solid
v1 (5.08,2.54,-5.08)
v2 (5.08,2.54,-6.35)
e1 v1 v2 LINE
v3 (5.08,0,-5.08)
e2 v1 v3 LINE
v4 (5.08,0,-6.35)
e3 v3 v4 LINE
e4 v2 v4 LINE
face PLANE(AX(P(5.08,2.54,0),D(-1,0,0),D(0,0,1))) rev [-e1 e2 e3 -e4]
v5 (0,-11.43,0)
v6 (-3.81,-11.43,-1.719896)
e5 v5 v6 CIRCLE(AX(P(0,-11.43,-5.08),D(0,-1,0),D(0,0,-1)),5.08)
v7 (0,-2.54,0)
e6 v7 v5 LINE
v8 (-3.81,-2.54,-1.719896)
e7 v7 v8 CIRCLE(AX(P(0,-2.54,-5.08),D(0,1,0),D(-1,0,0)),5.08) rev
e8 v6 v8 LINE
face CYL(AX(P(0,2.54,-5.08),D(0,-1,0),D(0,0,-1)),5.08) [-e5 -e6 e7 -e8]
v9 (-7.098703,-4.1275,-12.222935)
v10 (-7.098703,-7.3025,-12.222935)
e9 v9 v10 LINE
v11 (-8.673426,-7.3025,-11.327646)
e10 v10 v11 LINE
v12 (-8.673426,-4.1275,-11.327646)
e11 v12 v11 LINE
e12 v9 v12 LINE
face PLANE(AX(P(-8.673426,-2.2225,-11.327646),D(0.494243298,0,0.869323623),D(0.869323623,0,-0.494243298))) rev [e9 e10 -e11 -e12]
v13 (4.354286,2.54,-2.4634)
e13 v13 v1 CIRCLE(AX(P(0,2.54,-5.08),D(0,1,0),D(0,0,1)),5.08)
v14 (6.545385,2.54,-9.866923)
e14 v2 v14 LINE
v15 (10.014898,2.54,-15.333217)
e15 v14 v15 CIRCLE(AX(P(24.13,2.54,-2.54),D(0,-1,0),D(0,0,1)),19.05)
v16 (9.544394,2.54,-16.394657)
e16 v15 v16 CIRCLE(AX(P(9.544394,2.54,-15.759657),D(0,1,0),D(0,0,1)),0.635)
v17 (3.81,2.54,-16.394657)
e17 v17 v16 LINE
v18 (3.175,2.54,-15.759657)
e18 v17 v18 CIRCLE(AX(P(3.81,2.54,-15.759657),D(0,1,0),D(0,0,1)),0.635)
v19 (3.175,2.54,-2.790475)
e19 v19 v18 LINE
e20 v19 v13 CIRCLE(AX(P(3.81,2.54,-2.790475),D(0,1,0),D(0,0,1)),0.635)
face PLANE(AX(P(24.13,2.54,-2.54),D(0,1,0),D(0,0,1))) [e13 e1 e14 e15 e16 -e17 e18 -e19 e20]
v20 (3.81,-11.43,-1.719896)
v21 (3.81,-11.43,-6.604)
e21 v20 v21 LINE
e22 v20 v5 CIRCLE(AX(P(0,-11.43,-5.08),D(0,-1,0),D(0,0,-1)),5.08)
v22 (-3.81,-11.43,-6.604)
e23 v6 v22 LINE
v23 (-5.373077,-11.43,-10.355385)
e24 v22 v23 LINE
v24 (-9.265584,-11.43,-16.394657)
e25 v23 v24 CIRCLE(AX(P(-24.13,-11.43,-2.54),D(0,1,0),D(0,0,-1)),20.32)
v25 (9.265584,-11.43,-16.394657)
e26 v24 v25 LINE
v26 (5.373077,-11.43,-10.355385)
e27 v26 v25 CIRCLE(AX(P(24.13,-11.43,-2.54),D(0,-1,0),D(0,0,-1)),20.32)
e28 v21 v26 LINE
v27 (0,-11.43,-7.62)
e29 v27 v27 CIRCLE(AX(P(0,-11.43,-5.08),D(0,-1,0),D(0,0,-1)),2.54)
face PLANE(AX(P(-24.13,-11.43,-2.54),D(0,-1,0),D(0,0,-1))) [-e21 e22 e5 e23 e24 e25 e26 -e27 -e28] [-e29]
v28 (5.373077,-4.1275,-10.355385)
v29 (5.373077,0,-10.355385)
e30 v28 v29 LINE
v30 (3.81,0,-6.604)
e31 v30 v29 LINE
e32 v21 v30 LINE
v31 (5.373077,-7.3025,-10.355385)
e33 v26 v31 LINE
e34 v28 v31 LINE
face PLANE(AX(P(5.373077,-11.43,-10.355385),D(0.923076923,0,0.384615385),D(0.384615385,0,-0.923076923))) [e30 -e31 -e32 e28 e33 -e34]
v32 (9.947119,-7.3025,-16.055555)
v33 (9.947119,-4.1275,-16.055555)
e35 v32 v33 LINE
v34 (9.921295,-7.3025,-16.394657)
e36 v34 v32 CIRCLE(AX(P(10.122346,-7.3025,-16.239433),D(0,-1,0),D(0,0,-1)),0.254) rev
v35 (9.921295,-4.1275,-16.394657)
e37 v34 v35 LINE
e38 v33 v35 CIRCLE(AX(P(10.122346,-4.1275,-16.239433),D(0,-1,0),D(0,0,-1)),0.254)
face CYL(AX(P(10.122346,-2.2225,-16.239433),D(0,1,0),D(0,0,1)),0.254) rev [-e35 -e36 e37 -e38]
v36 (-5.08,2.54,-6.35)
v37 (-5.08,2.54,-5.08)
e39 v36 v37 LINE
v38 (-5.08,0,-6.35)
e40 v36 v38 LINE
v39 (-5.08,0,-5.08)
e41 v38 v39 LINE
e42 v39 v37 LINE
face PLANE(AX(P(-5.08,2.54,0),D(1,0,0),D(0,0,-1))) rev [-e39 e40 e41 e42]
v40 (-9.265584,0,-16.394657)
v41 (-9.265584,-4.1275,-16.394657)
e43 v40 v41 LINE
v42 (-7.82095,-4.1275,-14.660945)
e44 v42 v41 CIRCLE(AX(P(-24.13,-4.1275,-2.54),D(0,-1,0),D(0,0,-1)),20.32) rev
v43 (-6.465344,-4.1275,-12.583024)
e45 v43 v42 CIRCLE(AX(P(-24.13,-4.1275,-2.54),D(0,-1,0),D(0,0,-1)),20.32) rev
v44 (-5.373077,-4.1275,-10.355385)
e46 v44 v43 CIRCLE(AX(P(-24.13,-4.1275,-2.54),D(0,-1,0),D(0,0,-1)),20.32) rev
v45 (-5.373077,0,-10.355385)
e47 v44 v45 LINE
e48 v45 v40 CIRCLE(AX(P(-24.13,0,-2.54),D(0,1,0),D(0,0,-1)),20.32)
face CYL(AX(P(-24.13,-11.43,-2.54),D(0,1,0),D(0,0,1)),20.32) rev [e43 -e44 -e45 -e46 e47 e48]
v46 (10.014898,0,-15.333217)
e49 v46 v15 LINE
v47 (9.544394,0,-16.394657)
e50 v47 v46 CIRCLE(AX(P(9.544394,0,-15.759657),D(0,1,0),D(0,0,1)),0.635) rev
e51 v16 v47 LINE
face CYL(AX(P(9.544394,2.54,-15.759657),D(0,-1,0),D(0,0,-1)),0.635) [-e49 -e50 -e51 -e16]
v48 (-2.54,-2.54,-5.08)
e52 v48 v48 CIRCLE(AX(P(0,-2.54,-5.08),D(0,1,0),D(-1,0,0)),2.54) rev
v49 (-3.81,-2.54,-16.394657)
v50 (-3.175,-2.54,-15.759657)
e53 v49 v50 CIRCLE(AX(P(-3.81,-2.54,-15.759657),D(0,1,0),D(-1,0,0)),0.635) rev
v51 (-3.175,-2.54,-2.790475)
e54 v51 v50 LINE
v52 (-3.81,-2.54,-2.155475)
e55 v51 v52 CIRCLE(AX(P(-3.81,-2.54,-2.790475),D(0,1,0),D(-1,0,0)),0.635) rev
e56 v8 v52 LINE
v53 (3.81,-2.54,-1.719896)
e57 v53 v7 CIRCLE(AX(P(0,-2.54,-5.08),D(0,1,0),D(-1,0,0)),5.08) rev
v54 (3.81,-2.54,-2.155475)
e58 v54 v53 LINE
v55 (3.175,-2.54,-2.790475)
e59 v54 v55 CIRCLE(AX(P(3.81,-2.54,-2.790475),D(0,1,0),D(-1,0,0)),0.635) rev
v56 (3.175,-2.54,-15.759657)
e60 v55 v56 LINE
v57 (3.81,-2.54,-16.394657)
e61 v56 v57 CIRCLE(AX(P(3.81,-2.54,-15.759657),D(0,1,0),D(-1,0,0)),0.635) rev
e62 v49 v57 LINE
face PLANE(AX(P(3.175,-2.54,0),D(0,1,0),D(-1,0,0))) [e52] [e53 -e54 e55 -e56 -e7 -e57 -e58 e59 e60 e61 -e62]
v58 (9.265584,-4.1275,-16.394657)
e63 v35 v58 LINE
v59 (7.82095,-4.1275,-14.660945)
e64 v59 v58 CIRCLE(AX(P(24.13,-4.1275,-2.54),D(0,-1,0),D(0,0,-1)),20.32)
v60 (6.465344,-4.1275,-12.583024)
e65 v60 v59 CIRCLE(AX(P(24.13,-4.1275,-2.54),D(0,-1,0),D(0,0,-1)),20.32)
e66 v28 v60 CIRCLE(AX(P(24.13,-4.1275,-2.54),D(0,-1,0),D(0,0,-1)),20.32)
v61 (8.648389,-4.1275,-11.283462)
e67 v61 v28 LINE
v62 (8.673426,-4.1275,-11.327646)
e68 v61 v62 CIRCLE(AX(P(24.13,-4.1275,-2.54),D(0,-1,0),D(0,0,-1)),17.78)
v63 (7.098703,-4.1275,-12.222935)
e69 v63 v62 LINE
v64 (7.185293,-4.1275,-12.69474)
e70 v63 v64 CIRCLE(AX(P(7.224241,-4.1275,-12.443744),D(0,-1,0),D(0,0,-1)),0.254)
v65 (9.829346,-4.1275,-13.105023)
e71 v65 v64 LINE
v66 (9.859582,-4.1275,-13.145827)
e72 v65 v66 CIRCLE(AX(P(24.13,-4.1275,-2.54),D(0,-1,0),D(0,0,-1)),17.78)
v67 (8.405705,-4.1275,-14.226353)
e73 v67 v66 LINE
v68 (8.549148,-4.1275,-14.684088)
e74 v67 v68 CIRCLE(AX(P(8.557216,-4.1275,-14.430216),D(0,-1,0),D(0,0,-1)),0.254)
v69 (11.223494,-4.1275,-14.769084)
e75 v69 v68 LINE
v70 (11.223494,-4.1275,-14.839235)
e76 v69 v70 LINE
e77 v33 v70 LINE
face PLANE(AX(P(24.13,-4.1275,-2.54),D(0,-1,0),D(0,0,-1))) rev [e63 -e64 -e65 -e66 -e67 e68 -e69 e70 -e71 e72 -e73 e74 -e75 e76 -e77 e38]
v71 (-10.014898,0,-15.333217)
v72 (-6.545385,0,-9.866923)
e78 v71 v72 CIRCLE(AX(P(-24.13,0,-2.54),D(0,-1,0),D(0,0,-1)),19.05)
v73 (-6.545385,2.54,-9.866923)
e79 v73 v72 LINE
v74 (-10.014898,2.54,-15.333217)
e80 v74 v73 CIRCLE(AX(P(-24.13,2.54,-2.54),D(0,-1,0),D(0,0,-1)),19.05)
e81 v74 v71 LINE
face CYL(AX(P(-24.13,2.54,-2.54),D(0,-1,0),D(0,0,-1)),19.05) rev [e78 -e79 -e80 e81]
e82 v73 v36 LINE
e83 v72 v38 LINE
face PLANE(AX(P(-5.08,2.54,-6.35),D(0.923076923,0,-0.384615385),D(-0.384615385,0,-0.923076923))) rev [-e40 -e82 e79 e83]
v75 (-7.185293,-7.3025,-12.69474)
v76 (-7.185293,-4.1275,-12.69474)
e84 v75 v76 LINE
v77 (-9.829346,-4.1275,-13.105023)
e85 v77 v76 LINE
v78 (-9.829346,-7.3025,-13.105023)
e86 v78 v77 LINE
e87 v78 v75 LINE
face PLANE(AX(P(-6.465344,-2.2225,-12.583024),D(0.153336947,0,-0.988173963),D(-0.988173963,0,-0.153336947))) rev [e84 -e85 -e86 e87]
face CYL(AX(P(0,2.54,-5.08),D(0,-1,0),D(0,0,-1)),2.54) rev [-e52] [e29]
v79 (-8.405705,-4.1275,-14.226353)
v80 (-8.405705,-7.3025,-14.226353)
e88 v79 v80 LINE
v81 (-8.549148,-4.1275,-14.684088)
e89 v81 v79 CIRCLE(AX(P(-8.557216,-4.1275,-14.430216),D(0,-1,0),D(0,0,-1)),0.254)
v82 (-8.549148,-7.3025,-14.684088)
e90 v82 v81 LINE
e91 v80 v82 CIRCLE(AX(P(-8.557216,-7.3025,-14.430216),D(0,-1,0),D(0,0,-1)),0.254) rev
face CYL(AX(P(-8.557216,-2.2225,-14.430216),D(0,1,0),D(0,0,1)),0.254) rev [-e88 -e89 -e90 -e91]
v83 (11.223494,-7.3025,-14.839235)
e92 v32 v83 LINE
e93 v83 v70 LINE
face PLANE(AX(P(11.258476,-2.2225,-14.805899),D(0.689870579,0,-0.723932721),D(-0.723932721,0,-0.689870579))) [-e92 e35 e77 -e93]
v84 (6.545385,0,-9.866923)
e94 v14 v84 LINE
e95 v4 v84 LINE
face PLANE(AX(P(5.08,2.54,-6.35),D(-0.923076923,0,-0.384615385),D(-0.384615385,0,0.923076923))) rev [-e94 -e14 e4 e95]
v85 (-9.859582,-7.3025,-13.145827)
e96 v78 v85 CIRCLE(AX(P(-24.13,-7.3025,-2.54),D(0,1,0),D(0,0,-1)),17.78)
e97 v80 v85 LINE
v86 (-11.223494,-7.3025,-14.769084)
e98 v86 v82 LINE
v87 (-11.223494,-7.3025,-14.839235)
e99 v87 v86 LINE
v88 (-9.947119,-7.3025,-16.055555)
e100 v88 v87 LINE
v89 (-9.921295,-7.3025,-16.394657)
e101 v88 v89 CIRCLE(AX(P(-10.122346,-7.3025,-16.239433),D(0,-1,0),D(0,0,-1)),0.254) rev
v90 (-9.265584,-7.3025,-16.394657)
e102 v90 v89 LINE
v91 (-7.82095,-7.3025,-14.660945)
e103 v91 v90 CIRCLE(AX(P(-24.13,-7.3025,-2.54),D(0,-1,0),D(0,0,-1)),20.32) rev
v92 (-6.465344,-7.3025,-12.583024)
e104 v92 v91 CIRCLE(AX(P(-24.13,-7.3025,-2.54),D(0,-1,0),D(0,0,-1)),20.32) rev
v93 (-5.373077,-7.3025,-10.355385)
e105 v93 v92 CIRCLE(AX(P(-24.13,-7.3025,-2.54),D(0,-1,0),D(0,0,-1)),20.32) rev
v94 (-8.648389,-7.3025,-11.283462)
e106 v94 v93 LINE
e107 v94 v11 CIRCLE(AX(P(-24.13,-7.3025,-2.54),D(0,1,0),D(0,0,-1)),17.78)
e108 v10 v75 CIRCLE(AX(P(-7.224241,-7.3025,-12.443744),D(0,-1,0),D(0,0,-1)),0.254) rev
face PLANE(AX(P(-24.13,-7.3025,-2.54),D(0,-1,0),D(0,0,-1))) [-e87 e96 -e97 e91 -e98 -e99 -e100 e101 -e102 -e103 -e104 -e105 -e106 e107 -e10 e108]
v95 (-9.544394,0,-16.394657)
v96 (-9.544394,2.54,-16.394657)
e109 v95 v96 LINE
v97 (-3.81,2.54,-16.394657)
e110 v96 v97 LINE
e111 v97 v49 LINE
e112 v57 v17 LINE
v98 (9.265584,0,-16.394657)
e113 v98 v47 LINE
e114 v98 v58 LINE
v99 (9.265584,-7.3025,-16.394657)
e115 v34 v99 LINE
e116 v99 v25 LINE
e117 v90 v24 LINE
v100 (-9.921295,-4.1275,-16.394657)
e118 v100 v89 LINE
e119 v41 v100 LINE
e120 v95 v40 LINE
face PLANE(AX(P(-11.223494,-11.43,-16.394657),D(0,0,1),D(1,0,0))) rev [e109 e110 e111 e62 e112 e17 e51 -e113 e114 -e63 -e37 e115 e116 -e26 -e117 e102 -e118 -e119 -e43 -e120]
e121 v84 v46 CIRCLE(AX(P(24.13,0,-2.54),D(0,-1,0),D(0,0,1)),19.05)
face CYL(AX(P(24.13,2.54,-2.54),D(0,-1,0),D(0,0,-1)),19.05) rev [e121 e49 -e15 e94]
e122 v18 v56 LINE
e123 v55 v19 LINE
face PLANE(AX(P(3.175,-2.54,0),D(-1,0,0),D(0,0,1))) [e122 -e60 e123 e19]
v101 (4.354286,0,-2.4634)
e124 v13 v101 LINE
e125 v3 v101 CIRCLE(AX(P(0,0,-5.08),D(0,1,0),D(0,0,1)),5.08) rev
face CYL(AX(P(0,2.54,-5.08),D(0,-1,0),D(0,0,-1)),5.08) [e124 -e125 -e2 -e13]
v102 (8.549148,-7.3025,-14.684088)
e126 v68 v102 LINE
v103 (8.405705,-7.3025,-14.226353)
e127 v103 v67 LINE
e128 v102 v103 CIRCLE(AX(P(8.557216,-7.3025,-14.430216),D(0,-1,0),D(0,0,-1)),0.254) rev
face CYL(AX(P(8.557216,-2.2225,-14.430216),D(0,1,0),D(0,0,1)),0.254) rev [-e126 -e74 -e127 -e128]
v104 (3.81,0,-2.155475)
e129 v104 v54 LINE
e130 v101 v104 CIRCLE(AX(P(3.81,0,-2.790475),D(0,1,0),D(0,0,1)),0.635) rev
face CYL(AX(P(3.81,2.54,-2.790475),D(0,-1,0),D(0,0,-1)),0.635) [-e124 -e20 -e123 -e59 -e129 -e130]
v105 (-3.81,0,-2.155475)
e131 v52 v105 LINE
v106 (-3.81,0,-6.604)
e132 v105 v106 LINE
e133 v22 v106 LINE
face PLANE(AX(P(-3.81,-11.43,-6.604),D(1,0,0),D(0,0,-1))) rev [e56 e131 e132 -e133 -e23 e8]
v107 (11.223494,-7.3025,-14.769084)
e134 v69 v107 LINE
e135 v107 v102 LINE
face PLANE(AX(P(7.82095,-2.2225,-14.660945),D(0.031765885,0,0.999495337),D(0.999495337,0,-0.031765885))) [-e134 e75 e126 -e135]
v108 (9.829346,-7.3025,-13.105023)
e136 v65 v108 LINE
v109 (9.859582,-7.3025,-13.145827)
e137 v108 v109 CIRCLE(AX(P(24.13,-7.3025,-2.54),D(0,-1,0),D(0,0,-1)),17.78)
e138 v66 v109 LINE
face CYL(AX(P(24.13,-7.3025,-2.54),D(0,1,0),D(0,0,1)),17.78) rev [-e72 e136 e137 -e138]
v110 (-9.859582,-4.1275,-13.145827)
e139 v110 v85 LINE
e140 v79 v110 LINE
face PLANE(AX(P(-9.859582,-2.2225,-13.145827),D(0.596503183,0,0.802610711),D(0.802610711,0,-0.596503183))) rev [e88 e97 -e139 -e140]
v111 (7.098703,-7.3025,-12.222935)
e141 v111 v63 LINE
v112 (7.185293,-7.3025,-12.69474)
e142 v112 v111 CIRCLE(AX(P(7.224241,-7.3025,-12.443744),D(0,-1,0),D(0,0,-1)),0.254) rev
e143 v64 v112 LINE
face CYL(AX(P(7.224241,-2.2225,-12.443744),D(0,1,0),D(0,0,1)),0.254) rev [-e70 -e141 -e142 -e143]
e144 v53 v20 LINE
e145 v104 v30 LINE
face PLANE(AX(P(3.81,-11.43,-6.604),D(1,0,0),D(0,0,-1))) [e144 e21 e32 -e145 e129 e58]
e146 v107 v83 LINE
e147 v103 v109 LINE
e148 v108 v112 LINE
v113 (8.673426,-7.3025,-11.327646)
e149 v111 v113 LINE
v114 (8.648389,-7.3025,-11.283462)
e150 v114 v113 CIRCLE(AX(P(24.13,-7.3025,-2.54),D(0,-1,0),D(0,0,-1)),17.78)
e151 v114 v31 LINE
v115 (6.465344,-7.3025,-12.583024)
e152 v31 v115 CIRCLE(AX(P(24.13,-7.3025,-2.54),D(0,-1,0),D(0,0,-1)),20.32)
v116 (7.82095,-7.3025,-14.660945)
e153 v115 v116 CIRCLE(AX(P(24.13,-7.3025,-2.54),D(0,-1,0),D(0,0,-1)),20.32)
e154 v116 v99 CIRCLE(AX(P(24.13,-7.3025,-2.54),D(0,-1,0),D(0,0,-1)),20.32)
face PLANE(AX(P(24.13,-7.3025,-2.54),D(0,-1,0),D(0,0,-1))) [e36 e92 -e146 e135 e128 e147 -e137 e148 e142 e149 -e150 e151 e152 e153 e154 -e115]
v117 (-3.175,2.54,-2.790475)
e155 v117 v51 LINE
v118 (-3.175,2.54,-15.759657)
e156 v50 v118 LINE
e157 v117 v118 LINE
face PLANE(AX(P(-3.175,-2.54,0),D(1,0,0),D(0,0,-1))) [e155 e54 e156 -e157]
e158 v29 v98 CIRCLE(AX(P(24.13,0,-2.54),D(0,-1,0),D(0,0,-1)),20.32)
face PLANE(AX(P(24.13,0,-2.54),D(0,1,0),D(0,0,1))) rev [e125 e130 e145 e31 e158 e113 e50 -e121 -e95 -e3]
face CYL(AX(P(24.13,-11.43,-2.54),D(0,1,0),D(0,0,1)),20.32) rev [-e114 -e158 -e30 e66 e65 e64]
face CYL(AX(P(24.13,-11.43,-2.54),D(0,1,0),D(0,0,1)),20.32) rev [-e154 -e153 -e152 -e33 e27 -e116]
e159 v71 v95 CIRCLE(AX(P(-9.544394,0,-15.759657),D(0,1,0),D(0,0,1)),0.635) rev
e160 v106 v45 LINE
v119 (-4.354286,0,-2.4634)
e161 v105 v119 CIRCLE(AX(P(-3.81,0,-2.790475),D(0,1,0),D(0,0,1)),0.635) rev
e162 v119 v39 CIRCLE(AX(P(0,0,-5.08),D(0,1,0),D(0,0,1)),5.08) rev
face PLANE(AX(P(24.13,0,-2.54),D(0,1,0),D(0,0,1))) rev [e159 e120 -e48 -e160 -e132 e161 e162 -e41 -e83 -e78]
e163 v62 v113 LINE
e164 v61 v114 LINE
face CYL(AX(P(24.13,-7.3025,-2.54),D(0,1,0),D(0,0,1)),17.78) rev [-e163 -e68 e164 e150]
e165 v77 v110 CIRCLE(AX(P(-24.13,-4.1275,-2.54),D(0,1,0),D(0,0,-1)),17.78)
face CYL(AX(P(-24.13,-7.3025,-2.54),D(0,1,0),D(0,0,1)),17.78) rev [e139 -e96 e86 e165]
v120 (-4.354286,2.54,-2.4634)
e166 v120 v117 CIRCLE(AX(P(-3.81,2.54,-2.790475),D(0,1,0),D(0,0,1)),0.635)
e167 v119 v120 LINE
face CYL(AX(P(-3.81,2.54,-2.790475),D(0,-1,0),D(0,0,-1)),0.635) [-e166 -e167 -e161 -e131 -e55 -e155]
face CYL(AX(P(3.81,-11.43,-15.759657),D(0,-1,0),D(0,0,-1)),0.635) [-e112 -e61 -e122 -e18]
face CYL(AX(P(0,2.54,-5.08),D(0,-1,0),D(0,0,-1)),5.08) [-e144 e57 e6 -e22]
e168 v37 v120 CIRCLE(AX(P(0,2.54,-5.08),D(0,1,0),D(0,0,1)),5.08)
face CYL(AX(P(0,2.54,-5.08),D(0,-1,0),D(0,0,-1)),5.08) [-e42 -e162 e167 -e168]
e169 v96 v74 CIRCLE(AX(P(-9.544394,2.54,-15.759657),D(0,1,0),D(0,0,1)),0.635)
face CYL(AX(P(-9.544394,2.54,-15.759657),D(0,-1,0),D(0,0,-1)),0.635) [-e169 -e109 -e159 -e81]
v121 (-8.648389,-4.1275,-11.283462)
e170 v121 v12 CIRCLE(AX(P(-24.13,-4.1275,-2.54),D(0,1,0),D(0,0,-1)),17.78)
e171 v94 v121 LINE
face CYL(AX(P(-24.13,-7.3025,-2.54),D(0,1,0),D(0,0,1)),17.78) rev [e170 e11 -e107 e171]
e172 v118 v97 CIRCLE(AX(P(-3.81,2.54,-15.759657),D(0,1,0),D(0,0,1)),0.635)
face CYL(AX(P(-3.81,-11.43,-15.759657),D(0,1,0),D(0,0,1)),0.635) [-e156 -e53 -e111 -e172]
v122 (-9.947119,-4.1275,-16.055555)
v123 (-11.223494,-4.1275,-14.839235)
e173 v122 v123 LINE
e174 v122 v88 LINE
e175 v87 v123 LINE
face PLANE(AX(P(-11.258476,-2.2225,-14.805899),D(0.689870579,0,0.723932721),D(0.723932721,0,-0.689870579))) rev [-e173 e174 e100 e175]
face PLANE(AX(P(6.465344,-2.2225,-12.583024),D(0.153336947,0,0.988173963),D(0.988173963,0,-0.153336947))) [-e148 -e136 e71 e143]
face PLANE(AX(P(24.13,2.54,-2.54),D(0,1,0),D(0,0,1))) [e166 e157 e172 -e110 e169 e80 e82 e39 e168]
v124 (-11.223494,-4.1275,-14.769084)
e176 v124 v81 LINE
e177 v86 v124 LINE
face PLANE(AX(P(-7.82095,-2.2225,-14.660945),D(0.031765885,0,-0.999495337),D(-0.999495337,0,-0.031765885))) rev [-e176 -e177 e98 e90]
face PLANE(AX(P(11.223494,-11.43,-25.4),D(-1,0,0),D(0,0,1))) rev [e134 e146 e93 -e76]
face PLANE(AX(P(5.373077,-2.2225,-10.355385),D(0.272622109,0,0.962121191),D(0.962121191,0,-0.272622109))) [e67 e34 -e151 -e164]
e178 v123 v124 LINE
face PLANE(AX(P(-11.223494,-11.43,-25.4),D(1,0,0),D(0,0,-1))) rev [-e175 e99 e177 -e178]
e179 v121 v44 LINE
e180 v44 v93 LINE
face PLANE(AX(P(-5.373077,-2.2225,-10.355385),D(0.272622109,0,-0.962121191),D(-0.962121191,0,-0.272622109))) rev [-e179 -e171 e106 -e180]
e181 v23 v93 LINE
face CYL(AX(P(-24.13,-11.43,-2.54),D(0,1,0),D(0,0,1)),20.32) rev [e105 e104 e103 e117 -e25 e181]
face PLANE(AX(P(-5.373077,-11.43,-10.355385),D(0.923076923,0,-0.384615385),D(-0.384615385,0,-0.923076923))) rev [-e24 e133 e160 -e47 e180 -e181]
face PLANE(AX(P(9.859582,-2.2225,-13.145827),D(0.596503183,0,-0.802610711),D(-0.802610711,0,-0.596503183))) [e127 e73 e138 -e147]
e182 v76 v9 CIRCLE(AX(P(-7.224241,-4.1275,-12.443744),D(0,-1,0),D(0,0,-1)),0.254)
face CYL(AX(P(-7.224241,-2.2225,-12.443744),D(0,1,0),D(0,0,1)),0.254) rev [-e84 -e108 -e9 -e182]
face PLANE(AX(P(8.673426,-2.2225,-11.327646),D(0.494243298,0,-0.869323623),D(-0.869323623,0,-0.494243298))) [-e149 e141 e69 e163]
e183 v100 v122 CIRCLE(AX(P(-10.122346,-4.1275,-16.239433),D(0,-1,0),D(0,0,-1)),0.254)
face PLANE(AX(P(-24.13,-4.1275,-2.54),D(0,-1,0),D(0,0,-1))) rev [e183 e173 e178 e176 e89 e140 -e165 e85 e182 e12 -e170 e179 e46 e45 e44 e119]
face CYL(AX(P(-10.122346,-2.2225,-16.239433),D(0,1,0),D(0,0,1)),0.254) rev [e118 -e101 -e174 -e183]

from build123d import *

# Parameters (mm, degrees)
BOSS_EXTRUDE1_DEPTH  = 2.54
BOSS_EXTRUDE2_DEPTH  = 11.43
BOSS_EXTRUDE3_DEPTH  = 1.5875
CUT_EXTRUDE1_DEPTH   = 5.08
CUT_EXTRUDE2_DEPTH   = 5.08
CIRPATTERN1_COUNT    = 10
CIRPATTERN1_ANGLE    = 63
FILLET1_R            = 0.254
MIRROR1_COPY_1_DEPTH = 5.08
MIRROR1_COPY_2_DEPTH = 5.08
MIRROR1_COPY_3_DEPTH = 5.08
MIRROR1_COPY_4_DEPTH = 5.08
MIRROR1_COPY_5_DEPTH = 5.08
MIRROR1_COPY_6_DEPTH = 5.08
MIRROR1_COPY_7_DEPTH = 5.08
MIRROR1_COPY_8_DEPTH = 5.08
MIRROR1_COPY_9_DEPTH = 5.08
FILLET1_OF_MIRROR1_R = 0.254
FILLET3_R            = 5.08
SKETCH8_R            = 2.54
CUT_EXTRUDE3_DEPTH   = 37.969969278
SKETCH9_W            = 6.35
SKETCH9_H            = 5.08
CUT_EXTRUDE4_DEPTH   = 37.086876125
FILLET5_R            = 1.27
FILLET6_R            = 0.635
SKETCH10_W           = 12.288229788
SKETCH10_H           = 22.793910423
CUT_EXTRUDE5_DEPTH   = 37.969969278
SKETCH11_W           = 22.446987528
SKETCH11_H           = 9.005342915
CUT_EXTRUDE6_DEPTH   = 32.085168686
FILLET7_R            = 0.635


# Some blends are built 0.0001 mm under size
with BuildPart() as part:
    # Sketch1 → Boss-Extrude1 (new body)
    with BuildSketch(Plane(origin=(0, 0, 0), x_dir=(1, 0, 0), z_dir=(0, 1, 0))):
        with BuildLine():
            Line((-22.86, 25.4), (22.86, 25.4))
            Line((22.86, 25.4), (22.86, 21.547619525))
            ThreePointArc((22.86, 21.547619525), (13.040193974, 18.029309291), (6.545384615, 9.866923077))
            Line((6.545384615, 9.866923077), (5.08, 6.35))
            Line((5.08, 6.35), (5.08, 0))
            Line((5.08, 0), (-5.08, 0))
            Line((-5.08, 0), (-5.08, 6.35))
            Line((-5.08, 6.35), (-6.545384615, 9.866923077))
            ThreePointArc((-6.545384615, 9.866923077), (-13.040193974, 18.029309291), (-22.86, 21.547619525))
            Line((-22.86, 21.547619525), (-22.86, 25.4))
        make_face()
    extrude(amount=BOSS_EXTRUDE1_DEPTH)

    # Sketch3 → Boss-Extrude2 (add)
    with BuildSketch(Plane.XZ):
        with BuildLine():
            Line((-3.81, 0), (0, 0))
            Line((0, 0), (0, -25.4))
            Line((0, -25.4), (-21.59, -25.4))
            Line((-21.59, -25.4), (-22.86, -25.4))
            Line((-22.86, -25.4), (-22.86, -22.70062499))
            Line((-22.86, -22.70062499), (-21.59, -22.70062499))
            ThreePointArc((-21.59, -22.70062499), (-11.821833073, -18.70822275), (-5.373076923, -10.355384615))
            Line((-5.373076923, -10.355384615), (-3.81, -6.604))
            Line((-3.81, -6.604), (-3.81, 0))
        make_face()
    boss_extrude2 = extrude(amount=BOSS_EXTRUDE2_DEPTH)

    # Sketch4 → Boss-Extrude3 (add, symmetric)
    with BuildSketch(Plane(origin=(0, -5.715, 0), x_dir=(-1, 0, 0), z_dir=(0, -1, 0))):
        with BuildLine():
            Line((22.944666667, 20.28044489), (22.944666667, 25.4))
            Line((22.944666667, 25.4), (0, 25.4))
            Line((0, 25.4), (0, 0))
            Line((0, 0), (3.81, 0))
            Line((3.81, 0), (3.81, 6.604))
            Line((3.81, 6.604), (4.966025641, 9.378461538))
            Line((4.966025641, 9.378461538), (7.717692308, 9.378461538))
            ThreePointArc((7.717692308, 9.378461538), (13.779514375, 16.996688671), (22.944666667, 20.28044489))
        make_face()
    boss_extrude3 = extrude(amount=BOSS_EXTRUDE3_DEPTH, both=True)

    # Sketch6 → Cut-Extrude1 (cut)
    with BuildSketch(Plane.XZ.offset(7.3025)):
        Polygon((-7.717692308, -9.378461538), (-5.373076923, -10.355384615), (-8.648388962, -11.283461538), align=None)
    cut_extrude1 = extrude(amount=-CUT_EXTRUDE1_DEPTH, mode=Mode.SUBTRACT)

    # Sketch7 → Cut-Extrude2 (cut)
    with BuildSketch(Plane.XZ.offset(7.3025)):
        Polygon((-7.717692308, -9.378461538), (-5.373076923, -10.355384615), (-4.966025641, -9.378461538), align=None)
    cut_extrude2 = extrude(amount=-CUT_EXTRUDE2_DEPTH, mode=Mode.SUBTRACT)

    # CirPattern1: Cut-Extrude1 ×10 about axis
    cirpattern1_axis = Axis((-24.13, 0, -2.54), (0, 1, 0))
    for i in range(1, CIRPATTERN1_COUNT):
        add(cut_extrude1.rotate(cirpattern1_axis, i * CIRPATTERN1_ANGLE / (CIRPATTERN1_COUNT - 1)), mode=Mode.SUBTRACT)

    # Fillet1
    # the kernel refuses this fillet: 0.254 mm, written as the material it adds along each edge
    with BuildSketch(Plane(origin=(-22.5780938, -7.3025, -22.800651202), x_dir=(-0.07637333661020333, 0, 0.9970792914583196), z_dir=(0, 1, 0))) as fillet1_piece_1_section:
        with BuildLine():
            CenterArc((0.663062221, -0.254), FILLET1_R, 90, 108.665400871)
            Line((0.422421678, -0.335290399), (0.417608867, -0.336916207))
            ThreePointArc((0.417608867, -0.336916207), (0.208052614, -0.171624146), (-0.003158225, -0.003978947))
            Line((-0.003158225, -0.003978947), (0, 0.00508))
            Line((0, 0.00508), (0.663062221, 0.00508))
            Line((0.663062221, 0.00508), (0.663062221, 0))
        make_face()
    fillet1_piece_1 = extrude(amount=5.08, mode=Mode.PRIVATE)
    fillet1_piece_1 = split(fillet1_piece_1, bisect_by=Plane(origin=(-22.705091863, -5.715, -22.70062499), z_dir=(0, 0, 1)), keep=Keep.TOP, mode=Mode.PRIVATE)
    fillet1_piece_1 = split(fillet1_piece_1, bisect_by=Plane(origin=(-22.705091863, -4.1275, -22.489092759), z_dir=(0, -1, 0)), keep=Keep.TOP, mode=Mode.PRIVATE)
    fillet1_piece_1 = split(fillet1_piece_1, bisect_by=Plane(origin=(-22.944666667, -5.715, -22.489092759), z_dir=(1, 0, 0)), keep=Keep.TOP, mode=Mode.PRIVATE)
    add(fillet1_piece_1)
    with BuildSketch(Plane(origin=(-22.5780938, -8.960155552, -22.800651202), x_dir=(-0.07637333661019842, 0, 0.99707929145832), z_dir=(0, 1, 0))) as fillet1_piece_2_section:
        with BuildLine():
            CenterArc((0.663062221, -0.254), FILLET1_R, 90, 108.665400871)
            Line((0.422421678, -0.335290399), (0.417608867, -0.336916207))
            ThreePointArc((0.417608867, -0.336916207), (0.208052614, -0.171624146), (-0.003158225, -0.003978947))
            Line((-0.003158225, -0.003978947), (0, 0.00508))
            Line((0, 0.00508), (0.663062221, 0.00508))
            Line((0.663062221, 0.00508), (0.663062221, 0))
        make_face()
    fillet1_piece_2 = extrude(amount=6.737655552, mode=Mode.PRIVATE)
    fillet1_piece_2 = split(fillet1_piece_2, bisect_by=Plane(origin=(-22.610568063, -8.131327776, -22.70062499), z_dir=(0, 0, -1)), keep=Keep.TOP, mode=Mode.PRIVATE)
    fillet1_piece_2 = split(fillet1_piece_2, bisect_by=Plane(origin=(-22.610568063, -7.3025, -22.737867725), z_dir=(0, -1, 0)), keep=Keep.TOP, mode=Mode.PRIVATE)
    add(fillet1_piece_2)
    with BuildSketch(Plane(origin=(-22.5780938, -7.3025, -22.800651202), x_dir=(-0.07637333661020333, 0, 0.9970792914583196), z_dir=(0, 1, 0))) as fillet1_piece_3_section:
        with BuildLine():
            CenterArc((0.663062221, -0.254), FILLET1_R, 90, 108.665400871)
            Line((0.422421678, -0.335290399), (0.417608867, -0.336916207))
            ThreePointArc((0.417608867, -0.336916207), (0.208052614, -0.171624146), (-0.003158225, -0.003978947))
            Line((-0.003158225, -0.003978947), (0, 0.00508))
            Line((0, 0.00508), (0.663062221, 0.00508))
            Line((0.663062221, 0.00508), (0.663062221, 0))
        make_face()
    fillet1_piece_3 = extrude(amount=5.08, mode=Mode.PRIVATE)
    fillet1_piece_3 = split(fillet1_piece_3, bisect_by=Plane(origin=(-22.610568063, -5.715, -22.70062499), z_dir=(0, 0, -1)), keep=Keep.TOP, mode=Mode.PRIVATE)
    fillet1_piece_3 = split(fillet1_piece_3, bisect_by=Plane(origin=(-22.610568063, -4.1275, -22.737867725), z_dir=(0, -1, 0)), keep=Keep.TOP, mode=Mode.PRIVATE)
    add(fillet1_piece_3)
    with BuildSketch(Plane(origin=(-22.5780938, -7.3025, -22.800651202), x_dir=(-0.07637333661020333, 0, 0.9970792914583196), z_dir=(0, 1, 0))) as fillet1_piece_4_section:
        with BuildLine():
            CenterArc((0.663062221, -0.254), FILLET1_R, 90, 108.665400871)
            Line((0.422421678, -0.335290399), (0.417608867, -0.336916207))
            ThreePointArc((0.417608867, -0.336916207), (0.208052614, -0.171624146), (-0.003158225, -0.003978947))
            Line((-0.003158225, -0.003978947), (0, 0.00508))
            Line((0, 0.00508), (0.663062221, 0.00508))
            Line((0.663062221, 0.00508), (0.663062221, 0))
        make_face()
    fillet1_piece_4 = extrude(amount=5.08, mode=Mode.PRIVATE)
    fillet1_piece_4 = split(fillet1_piece_4, bisect_by=Plane(origin=(-22.610568063, -3.175, -22.70062499), z_dir=(0, 0, -1)), keep=Keep.TOP, mode=Mode.PRIVATE)
    fillet1_piece_4 = split(fillet1_piece_4, bisect_by=Plane(origin=(-22.610568063, -4.1275, -22.737867725), z_dir=(0, 1, 0)), keep=Keep.TOP, mode=Mode.PRIVATE)
    add(fillet1_piece_4)
    with BuildSketch(Plane(origin=(-22.5780938, -7.3025, -22.800651202), x_dir=(-0.07637333661020333, 0, 0.9970792914583196), z_dir=(0, 1, 0))) as fillet1_piece_5_section:
        with BuildLine():
            CenterArc((0.663062221, -0.254), FILLET1_R, 90, 108.665400871)
            Line((0.422421678, -0.335290399), (0.417608867, -0.336916207))
            ThreePointArc((0.417608867, -0.336916207), (0.208052614, -0.171624146), (-0.003158225, -0.003978947))
            Line((-0.003158225, -0.003978947), (0, 0.00508))
            Line((0, 0.00508), (0.663062221, 0.00508))
            Line((0.663062221, 0.00508), (0.663062221, 0))
        make_face()
    fillet1_piece_5 = extrude(amount=6.737655552, mode=Mode.PRIVATE)
    fillet1_piece_5 = split(fillet1_piece_5, bisect_by=Plane(origin=(-22.610568063, -1.393672224, -22.70062499), z_dir=(0, 0, -1)), keep=Keep.TOP, mode=Mode.PRIVATE)
    fillet1_piece_5 = split(fillet1_piece_5, bisect_by=Plane(origin=(-22.610568063, -2.2225, -22.737867725), z_dir=(0, 1, 0)), keep=Keep.TOP, mode=Mode.PRIVATE)
    add(fillet1_piece_5)
    with BuildSketch(Plane(origin=(-20.120509215, -7.3025, -22.460501591), x_dir=(-0.7640253133482992, 0, 0.6451862681141263), z_dir=(0, 1, 0)), Plane(origin=(-17.722696902, -7.3025, -21.823383184), x_dir=(-0.836958811389497, 0, 0.5472658842258308), z_dir=(0, 1, 0)), Plane(origin=(-15.42040272, -7.3025, -20.898793948), x_dir=(-0.8974151813055786, 0, 0.4411870265117453), z_dir=(0, 1, 0)), Plane(origin=(-13.247948573, -7.3025, -19.70051738), x_dir=(-0.9444931578692072, 0, 0.3285310864107881), z_dir=(0, 1, 0))) as fillet1_piece_6:
        with BuildLine():
            CenterArc((FILLET1_R * 2.86836666105, FILLET1_R), FILLET1_R, 128.440222299, 141.559777701)
            Line((FILLET1_R * 2.24666887201, FILLET1_R * 1.78325721133), (FILLET1_R * 2.23423491622, FILLET1_R * 1.79892235556))
            Line((FILLET1_R * 2.23423491622, FILLET1_R * 1.79892235556), (-FILLET1_R * 0.0124339557808, FILLET1_R * 0.0156651442266))
            Line((-FILLET1_R * 0.0124339557808, FILLET1_R * 0.0156651442266), (0, -FILLET1_R * 0.02))
            Line((0, -FILLET1_R * 0.02), (FILLET1_R * 2.86836666105, -FILLET1_R * 0.02))
            Line((FILLET1_R * 2.86836666105, -FILLET1_R * 0.02), (FILLET1_R * 2.86836666105, 0))
        make_face()
    extrude(amount=3.175)
    with BuildSketch(Plane(origin=(-11.237720749, -7.3025, -18.246417023), x_dir=(-0.6344625615675041, 0, 0.772953593671186), z_dir=(0, 1, 0)), Plane(origin=(-9.419687114, -7.3025, -16.558170165), x_dir=(-0.723932720787678, 0, 0.6898705790022863), z_dir=(0, 1, 0)), Plane(origin=(-7.820950361, -7.3025, -14.660944678), x_dir=(-0.8026107105625789, 0, 0.5965031829673938), z_dir=(0, 1, 0)), Plane(origin=(-6.465343975, -7.3025, -12.583023823), x_dir=(-0.8693236232823137, 0, 0.49424329838988196), z_dir=(0, 1, 0))) as fillet1_piece_7:
        with BuildLine():
            CenterArc((FILLET1_R * 2.86836666105, -FILLET1_R), FILLET1_R, 90, 141.559777701)
            Line((FILLET1_R * 2.24666887201, -FILLET1_R * 1.78325721133), (FILLET1_R * 2.23423491622, -FILLET1_R * 1.79892235556))
            Line((FILLET1_R * 2.23423491622, -FILLET1_R * 1.79892235556), (-FILLET1_R * 0.0124339557808, -FILLET1_R * 0.0156651442266))
            Line((-FILLET1_R * 0.0124339557808, -FILLET1_R * 0.0156651442266), (0, FILLET1_R * 0.02))
            Line((0, FILLET1_R * 0.02), (FILLET1_R * 2.86836666105, FILLET1_R * 0.02))
            Line((FILLET1_R * 2.86836666105, FILLET1_R * 0.02), (FILLET1_R * 2.86836666105, 0))
        make_face()
    extrude(amount=3.175)

    # Mirror1: Boss-Extrude2, Boss-Extrude3, Cut-Extrude1, Cut-Extrude2 across plane
    add(boss_extrude2.mirror(Plane(origin=(0, -11.43, 0), x_dir=(0, 0, 1), z_dir=(-1, 0, 0))))
    add(boss_extrude3.mirror(Plane(origin=(0, -11.43, 0), x_dir=(0, 0, 1), z_dir=(-1, 0, 0))))
    add(cut_extrude1.mirror(Plane(origin=(0, -11.43, 0), x_dir=(0, 0, 1), z_dir=(-1, 0, 0))), mode=Mode.SUBTRACT)
    add(cut_extrude2.mirror(Plane(origin=(0, -11.43, 0), x_dir=(0, 0, 1), z_dir=(-1, 0, 0))), mode=Mode.SUBTRACT)

    # Mirror1 copy 1 sketch → Mirror1 copy 1 (cut)
    with BuildSketch(Plane(origin=(-0.129686771, -7.3025, -2.959640031), x_dir=(-0.992546151641322, 0, -0.12186934340514778), z_dir=(0, -1, 0))):
        Polygon((-7.717692308, 9.378461538), (-5.373076923, 10.355384615), (-8.648388962, 11.283461538), align=None)
    extrude(amount=-MIRROR1_COPY_1_DEPTH, mode=Mode.SUBTRACT)

    # Mirror1 copy 2 sketch → Mirror1 copy 2 (cut)
    with BuildSketch(Plane(origin=(0.10228251, -7.3025, -5.913024196), x_dir=(-0.9702957262759964, 0, -0.2419218955996683), z_dir=(0, -1, 0))):
        Polygon((-7.717692308, 9.378461538), (-5.373076923, 10.355384615), (-8.648388962, 11.283461538), align=None)
    extrude(amount=-MIRROR1_COPY_2_DEPTH, mode=Mode.SUBTRACT)

    # Mirror1 copy 3 sketch → Mirror1 copy 3 (cut)
    with BuildSketch(Plane(origin=(0.692449717, -7.3025, -8.816124339), x_dir=(-0.9335804264972014, 0, -0.35836794954530116), z_dir=(0, -1, 0))):
        Polygon((-7.717692308, 9.378461538), (-5.373076923, 10.355384615), (-8.648388962, 11.283461538), align=None)
    extrude(amount=-MIRROR1_COPY_3_DEPTH, mode=Mode.SUBTRACT)

    # Mirror1 copy 4 sketch → Mirror1 copy 4 (cut)
    with BuildSketch(Plane(origin=(1.632016815, -7.3025, -11.625661924), x_dir=(-0.8829475928589263, 0, -0.46947156278589186), z_dir=(0, -1, 0))):
        Polygon((-7.717692308, 9.378461538), (-5.373076923, 10.355384615), (-8.648388962, 11.283461538), align=None)
    extrude(amount=-MIRROR1_COPY_4_DEPTH, mode=Mode.SUBTRACT)

    # Mirror1 copy 5 sketch → Mirror1 copy 5 (cut)
    with BuildSketch(Plane(origin=(2.906977023, -7.3025, -14.299753217), x_dir=(-0.8191520442889909, 0, -0.5735764363510474), z_dir=(0, -1, 0))):
        Polygon((-7.717692308, 9.378461538), (-5.373076923, 10.355384615), (-8.648388962, 11.283461538), align=None)
    extrude(amount=-MIRROR1_COPY_5_DEPTH, mode=Mode.SUBTRACT)

    # Mirror1 copy 6 sketch → Mirror1 copy 6 (cut)
    with BuildSketch(Plane(origin=(4.498323621, -7.3025, -16.798533675), x_dir=(-0.7431448254773929, 0, -0.6691306063588596), z_dir=(0, -1, 0))):
        Polygon((-7.717692308, 9.378461538), (-5.373076923, 10.355384615), (-8.648388962, 11.283461538), align=None)
    extrude(amount=-MIRROR1_COPY_6_DEPTH, mode=Mode.SUBTRACT)

    # Mirror1 copy 7 sketch → Mirror1 copy 7 (cut)
    with BuildSketch(Plane(origin=(6.382333297, -7.3025, -19.084752237), x_dir=(-0.6560590289905056, 0, -0.7547095802227735), z_dir=(0, -1, 0))):
        Polygon((-7.717692308, 9.378461538), (-5.373076923, 10.355384615), (-8.648388962, 11.283461538), align=None)
    extrude(amount=-MIRROR1_COPY_7_DEPTH, mode=Mode.SUBTRACT)

    # Mirror1 copy 8 sketch → Mirror1 copy 8 (cut)
    with BuildSketch(Plane(origin=(8.530919805, -7.3025, -21.124326651), x_dir=(-0.5591929034707448, 0, -0.8290375725550431), z_dir=(0, -1, 0))):
        Polygon((-7.717692308, 9.378461538), (-5.373076923, 10.355384615), (-8.648388962, 11.283461538), align=None)
    extrude(amount=-MIRROR1_COPY_8_DEPTH, mode=Mode.SUBTRACT)

    # Mirror1 copy 9 sketch → Mirror1 copy 9 (cut)
    with BuildSketch(Plane(origin=(10.91205267, -7.3025, -22.886851559), x_dir=(-0.4539904997395445, 0, -0.891006524188369), z_dir=(0, -1, 0))):
        Polygon((-7.717692308, 9.378461538), (-5.373076923, 10.355384615), (-8.648388962, 11.283461538), align=None)
    extrude(amount=-MIRROR1_COPY_9_DEPTH, mode=Mode.SUBTRACT)

    # Fillet1 of Mirror1
    # the kernel refuses this fillet: 0.254 mm, written as the material it adds along each edge
    with BuildSketch(Plane(origin=(22.5780938, -7.3025, -22.800651202), x_dir=(0.679701957651323, 0, 0.733488410791172), z_dir=(0, 1, 0))) as fillet1_of_mirror1_piece_1_section:
        with BuildLine():
            CenterArc((0.677259504, -0.213276985), FILLET1_OF_MIRROR1_R, 122.89437683, 108.665400871)
            Line((0.519348266, -0.412224317), (0.516190041, -0.416203263))
            Line((0.516190041, -0.416203263), (-0.003158225, -0.003978947))
            Line((-0.003158225, -0.003978947), (0, 0.00508))
            ThreePointArc((0, 0.00508), (0.269657063, 0.00508), (0.536555217, 0.00426554))
            Line((0.536555217, 0.00426554), (0.539314125, 0))
        make_face()
    fillet1_of_mirror1_piece_1 = extrude(amount=5.08, mode=Mode.PRIVATE)
    fillet1_of_mirror1_piece_1 = split(fillet1_of_mirror1_piece_1, bisect_by=Plane(origin=(22.705091863, -4.1275, -22.489092759), z_dir=(0, -1, 0)), keep=Keep.TOP, mode=Mode.PRIVATE)
    fillet1_of_mirror1_piece_1 = split(fillet1_of_mirror1_piece_1, bisect_by=Plane(origin=(22.944666667, -5.715, -22.489092759), z_dir=(-1, 0, 0)), keep=Keep.TOP, mode=Mode.PRIVATE)
    fillet1_of_mirror1_piece_1 = split(fillet1_of_mirror1_piece_1, bisect_by=Plane(origin=(22.705091863, -5.715, -22.70062499), z_dir=(0, 0, 1)), keep=Keep.TOP, mode=Mode.PRIVATE)
    add(fillet1_of_mirror1_piece_1)
    with BuildSketch(Plane(origin=(22.5780938, -8.960155552, -22.800651202), x_dir=(0.6797019576513229, 0, 0.7334884107911723), z_dir=(0, 1, 0))) as fillet1_of_mirror1_piece_2_section:
        with BuildLine():
            CenterArc((0.677259504, -0.213276985), FILLET1_OF_MIRROR1_R, 122.89437683, 108.665400871)
            Line((0.519348266, -0.412224317), (0.516190041, -0.416203263))
            Line((0.516190041, -0.416203263), (-0.003158225, -0.003978947))
            Line((-0.003158225, -0.003978947), (0, 0.00508))
            ThreePointArc((0, 0.00508), (0.269657063, 0.00508), (0.536555217, 0.00426554))
            Line((0.536555217, 0.00426554), (0.539314125, 0))
        make_face()
    fillet1_of_mirror1_piece_2 = extrude(amount=6.737655552, mode=Mode.PRIVATE)
    fillet1_of_mirror1_piece_2 = split(fillet1_of_mirror1_piece_2, bisect_by=Plane(origin=(22.610568063, -8.131327776, -22.70062499), z_dir=(0, 0, -1)), keep=Keep.TOP, mode=Mode.PRIVATE)
    fillet1_of_mirror1_piece_2 = split(fillet1_of_mirror1_piece_2, bisect_by=Plane(origin=(22.610568063, -7.3025, -22.737867725), z_dir=(0, -1, 0)), keep=Keep.TOP, mode=Mode.PRIVATE)
    add(fillet1_of_mirror1_piece_2)
    with BuildSketch(Plane(origin=(22.5780938, -7.3025, -22.800651202), x_dir=(0.679701957651323, 0, 0.733488410791172), z_dir=(0, 1, 0))) as fillet1_of_mirror1_piece_3_section:
        with BuildLine():
            CenterArc((0.677259504, -0.213276985), FILLET1_OF_MIRROR1_R, 122.89437683, 108.665400871)
            Line((0.519348266, -0.412224317), (0.516190041, -0.416203263))
            Line((0.516190041, -0.416203263), (-0.003158225, -0.003978947))
            Line((-0.003158225, -0.003978947), (0, 0.00508))
            ThreePointArc((0, 0.00508), (0.269657063, 0.00508), (0.536555217, 0.00426554))
            Line((0.536555217, 0.00426554), (0.539314125, 0))
        make_face()
    fillet1_of_mirror1_piece_3 = extrude(amount=5.08, mode=Mode.PRIVATE)
    fillet1_of_mirror1_piece_3 = split(fillet1_of_mirror1_piece_3, bisect_by=Plane(origin=(22.610568063, -4.1275, -22.737867725), z_dir=(0, -1, 0)), keep=Keep.TOP, mode=Mode.PRIVATE)
    fillet1_of_mirror1_piece_3 = split(fillet1_of_mirror1_piece_3, bisect_by=Plane(origin=(22.610568063, -5.715, -22.70062499), z_dir=(0, 0, -1)), keep=Keep.TOP, mode=Mode.PRIVATE)
    add(fillet1_of_mirror1_piece_3)
    with BuildSketch(Plane(origin=(22.5780938, -7.3025, -22.800651202), x_dir=(0.679701957651323, 0, 0.733488410791172), z_dir=(0, 1, 0))) as fillet1_of_mirror1_piece_4_section:
        with BuildLine():
            CenterArc((0.677259504, -0.213276985), FILLET1_OF_MIRROR1_R, 122.89437683, 108.665400871)
            Line((0.519348266, -0.412224317), (0.516190041, -0.416203263))
            Line((0.516190041, -0.416203263), (-0.003158225, -0.003978947))
            Line((-0.003158225, -0.003978947), (0, 0.00508))
            ThreePointArc((0, 0.00508), (0.269657063, 0.00508), (0.536555217, 0.00426554))
            Line((0.536555217, 0.00426554), (0.539314125, 0))
        make_face()
    fillet1_of_mirror1_piece_4 = extrude(amount=5.08, mode=Mode.PRIVATE)
    fillet1_of_mirror1_piece_4 = split(fillet1_of_mirror1_piece_4, bisect_by=Plane(origin=(22.610568063, -4.1275, -22.737867725), z_dir=(0, 1, 0)), keep=Keep.TOP, mode=Mode.PRIVATE)
    fillet1_of_mirror1_piece_4 = split(fillet1_of_mirror1_piece_4, bisect_by=Plane(origin=(22.610568063, -3.175, -22.70062499), z_dir=(0, 0, -1)), keep=Keep.TOP, mode=Mode.PRIVATE)
    add(fillet1_of_mirror1_piece_4)
    with BuildSketch(Plane(origin=(22.5780938, -7.3025, -22.800651202), x_dir=(0.679701957651323, 0, 0.733488410791172), z_dir=(0, 1, 0))) as fillet1_of_mirror1_piece_5_section:
        with BuildLine():
            CenterArc((0.677259504, -0.213276985), FILLET1_OF_MIRROR1_R, 122.89437683, 108.665400871)
            Line((0.519348266, -0.412224317), (0.516190041, -0.416203263))
            Line((0.516190041, -0.416203263), (-0.003158225, -0.003978947))
            Line((-0.003158225, -0.003978947), (0, 0.00508))
            ThreePointArc((0, 0.00508), (0.269657063, 0.00508), (0.536555217, 0.00426554))
            Line((0.536555217, 0.00426554), (0.539314125, 0))
        make_face()
    fillet1_of_mirror1_piece_5 = extrude(amount=6.737655552, mode=Mode.PRIVATE)
    fillet1_of_mirror1_piece_5 = split(fillet1_of_mirror1_piece_5, bisect_by=Plane(origin=(22.610568063, -1.393672224, -22.70062499), z_dir=(0, 0, -1)), keep=Keep.TOP, mode=Mode.PRIVATE)
    fillet1_of_mirror1_piece_5 = split(fillet1_of_mirror1_piece_5, bisect_by=Plane(origin=(22.610568063, -2.2225, -22.737867725), z_dir=(0, 1, 0)), keep=Keep.TOP, mode=Mode.PRIVATE)
    add(fillet1_of_mirror1_piece_5)
    with BuildSketch(Plane(origin=(20.120509215, -7.3025, -22.460501591), x_dir=(0.7640253133482992, 0, 0.6451862681141263), z_dir=(0, 1, 0)), Plane(origin=(17.722696902, -7.3025, -21.823383184), x_dir=(0.836958811389497, 0, 0.5472658842258308), z_dir=(0, 1, 0)), Plane(origin=(15.42040272, -7.3025, -20.898793948), x_dir=(0.8974151813055792, 0, 0.44118702651174435), z_dir=(0, 1, 0)), Plane(origin=(13.247948573, -7.3025, -19.70051738), x_dir=(0.9444931578692072, 0, 0.3285310864107881), z_dir=(0, 1, 0)), Plane(origin=(11.237720749, -7.3025, -18.246417023), x_dir=(0.9774909168837043, 0, 0.21097750451139333), z_dir=(0, 1, 0)), Plane(origin=(9.419687114, -7.3025, -16.558170165), x_dir=(0.995916537765328, 0, 0.0902787339605628), z_dir=(0, 1, 0)), Plane(origin=(7.820950361, -7.3025, -14.660944678), x_dir=(0.9994953369461473, 0, -0.03176588457618356), z_dir=(0, 1, 0)), Plane(origin=(6.465343975, -7.3025, -12.583023823), x_dir=(0.9881739627733617, 0, -0.15333694693970756), z_dir=(0, 1, 0))) as fillet1_of_mirror1_piece_6:
        with BuildLine():
            CenterArc((FILLET1_OF_MIRROR1_R * 2.86836666105, -FILLET1_OF_MIRROR1_R), FILLET1_OF_MIRROR1_R, 90, 141.559777701)
            Line((FILLET1_OF_MIRROR1_R * 2.24666887201, -FILLET1_OF_MIRROR1_R * 1.78325721133), (FILLET1_OF_MIRROR1_R * 2.23423491622, -FILLET1_OF_MIRROR1_R * 1.79892235556))
            Line((FILLET1_OF_MIRROR1_R * 2.23423491622, -FILLET1_OF_MIRROR1_R * 1.79892235556), (-FILLET1_OF_MIRROR1_R * 0.0124339557808, -FILLET1_OF_MIRROR1_R * 0.0156651442266))
            Line((-FILLET1_OF_MIRROR1_R * 0.0124339557808, -FILLET1_OF_MIRROR1_R * 0.0156651442266), (0, FILLET1_OF_MIRROR1_R * 0.02))
            Line((0, FILLET1_OF_MIRROR1_R * 0.02), (FILLET1_OF_MIRROR1_R * 2.86836666105, FILLET1_OF_MIRROR1_R * 0.02))
            Line((FILLET1_OF_MIRROR1_R * 2.86836666105, FILLET1_OF_MIRROR1_R * 0.02), (FILLET1_OF_MIRROR1_R * 2.86836666105, 0))
        make_face()
    extrude(amount=3.175)

    # Fillet3
    fillet3_edges = [part.edges().sort_by_distance(p)[0] for p in [
        (5.08, 1.27, 0),
        (-5.08, 1.27, 0),
    ]]
    fillet(fillet3_edges, radius=FILLET3_R - 0.0001)  # a hair under: the kernel refuses the full size

    # Sketch8 → Cut-Extrude3 (cut, through all)
    with BuildSketch(Plane.XZ.offset(11.43)):
        with Locations(Location((0, -5.08, 0), (0, 0, 270))):
            Circle(SKETCH8_R)
    extrude(amount=-CUT_EXTRUDE3_DEPTH, mode=Mode.SUBTRACT)

    # Sketch9 → Cut-Extrude4 (cut, through all)
    with BuildSketch(Plane.XY.offset(-25.4)):
        Rectangle(SKETCH9_W, SKETCH9_H)
    extrude(amount=CUT_EXTRUDE4_DEPTH, mode=Mode.SUBTRACT)

    # Fillet5
    fillet5_edges = [part.edges().sort_by_distance(p)[0] for p in [
        (-22.86, 1.27, -21.547619525),
        (-22.86, -9.36625, -22.70062499),
        (-22.86, -2.06375, -22.70062499),
        (22.86, 1.27, -21.547619525),
        (22.86, -2.06375, -22.70062499),
        (22.86, -9.36625, -22.70062499),
        (22.86, -0.79375, -25.4),
        (-22.86, -0.79375, -25.4),
    ]]
    fillet(fillet5_edges, radius=FILLET5_R - 0.0001)  # a hair under: the kernel refuses the full size

    # Fillet6
    # the kernel refuses this fillet: 0.635 mm, written as the material it takes off along each edge
    with BuildSketch(Plane(origin=(3.175, -2.54, -1.11437431), x_dir=(0, 0, -1), z_dir=(0, 1, 0))) as fillet6_piece_1:
        with BuildLine():
            CenterArc((1.676028366, -0.635), FILLET6_R, 90, 148.996923357)
            ThreePointArc((1.348949961, -1.179283673), (0.622070551, -0.649585814), (0, 0))
            Line((0, 0), (1.676028366, 0))
        make_face()
    extrude(amount=9.559380523, mode=Mode.SUBTRACT)
    with BuildSketch(Plane(origin=(-3.175, -2.54, -1.11437431), x_dir=(0, 0, -1), z_dir=(0, 1, 0))) as fillet6_piece_2:
        with BuildLine():
            CenterArc((1.676028366, 0.635), FILLET6_R, 121.003076643, 148.996923357)
            ThreePointArc((1.348949961, 1.179283673), (0.622070551, 0.649585814), (0, 0))
            Line((0, 0), (1.676028366, 0))
        make_face()
    extrude(amount=9.559380523, mode=Mode.SUBTRACT)

    # Sketch10 → Cut-Extrude5 (cut, through all)
    with BuildSketch(Plane(origin=(0, 2.54, 0), x_dir=(1, 0, 0), z_dir=(0, 1, 0))):
        with Locations((-17.367608658, 14.003044789)):
            Rectangle(SKETCH10_W, SKETCH10_H)
        with Locations((17.367608658, 14.003044789)):
            Rectangle(SKETCH10_W, SKETCH10_H)
    extrude(amount=-CUT_EXTRUDE5_DEPTH, mode=Mode.SUBTRACT)

    # Sketch11 → Cut-Extrude6 (cut, through all)
    with BuildSketch(Plane(origin=(0, 2.54, 0), x_dir=(1, 0, 0), z_dir=(0, 1, 0))):
        with Locations((0, 20.897328543)):
            Rectangle(SKETCH11_W, SKETCH11_H)
    extrude(amount=-CUT_EXTRUDE6_DEPTH, mode=Mode.SUBTRACT)

    # Fillet7
    fillet7_edges = [part.edges().sort_by_distance(p)[0] for p in [
        (-11.055177743, 1.27, -16.394657085),
        (11.055177743, 1.27, -16.394657085),
        (-3.175, 0, -16.394657085),
        (3.175, 0, -16.394657085),
    ]]
    fillet(fillet7_edges, radius=FILLET7_R)


solid = part.part
